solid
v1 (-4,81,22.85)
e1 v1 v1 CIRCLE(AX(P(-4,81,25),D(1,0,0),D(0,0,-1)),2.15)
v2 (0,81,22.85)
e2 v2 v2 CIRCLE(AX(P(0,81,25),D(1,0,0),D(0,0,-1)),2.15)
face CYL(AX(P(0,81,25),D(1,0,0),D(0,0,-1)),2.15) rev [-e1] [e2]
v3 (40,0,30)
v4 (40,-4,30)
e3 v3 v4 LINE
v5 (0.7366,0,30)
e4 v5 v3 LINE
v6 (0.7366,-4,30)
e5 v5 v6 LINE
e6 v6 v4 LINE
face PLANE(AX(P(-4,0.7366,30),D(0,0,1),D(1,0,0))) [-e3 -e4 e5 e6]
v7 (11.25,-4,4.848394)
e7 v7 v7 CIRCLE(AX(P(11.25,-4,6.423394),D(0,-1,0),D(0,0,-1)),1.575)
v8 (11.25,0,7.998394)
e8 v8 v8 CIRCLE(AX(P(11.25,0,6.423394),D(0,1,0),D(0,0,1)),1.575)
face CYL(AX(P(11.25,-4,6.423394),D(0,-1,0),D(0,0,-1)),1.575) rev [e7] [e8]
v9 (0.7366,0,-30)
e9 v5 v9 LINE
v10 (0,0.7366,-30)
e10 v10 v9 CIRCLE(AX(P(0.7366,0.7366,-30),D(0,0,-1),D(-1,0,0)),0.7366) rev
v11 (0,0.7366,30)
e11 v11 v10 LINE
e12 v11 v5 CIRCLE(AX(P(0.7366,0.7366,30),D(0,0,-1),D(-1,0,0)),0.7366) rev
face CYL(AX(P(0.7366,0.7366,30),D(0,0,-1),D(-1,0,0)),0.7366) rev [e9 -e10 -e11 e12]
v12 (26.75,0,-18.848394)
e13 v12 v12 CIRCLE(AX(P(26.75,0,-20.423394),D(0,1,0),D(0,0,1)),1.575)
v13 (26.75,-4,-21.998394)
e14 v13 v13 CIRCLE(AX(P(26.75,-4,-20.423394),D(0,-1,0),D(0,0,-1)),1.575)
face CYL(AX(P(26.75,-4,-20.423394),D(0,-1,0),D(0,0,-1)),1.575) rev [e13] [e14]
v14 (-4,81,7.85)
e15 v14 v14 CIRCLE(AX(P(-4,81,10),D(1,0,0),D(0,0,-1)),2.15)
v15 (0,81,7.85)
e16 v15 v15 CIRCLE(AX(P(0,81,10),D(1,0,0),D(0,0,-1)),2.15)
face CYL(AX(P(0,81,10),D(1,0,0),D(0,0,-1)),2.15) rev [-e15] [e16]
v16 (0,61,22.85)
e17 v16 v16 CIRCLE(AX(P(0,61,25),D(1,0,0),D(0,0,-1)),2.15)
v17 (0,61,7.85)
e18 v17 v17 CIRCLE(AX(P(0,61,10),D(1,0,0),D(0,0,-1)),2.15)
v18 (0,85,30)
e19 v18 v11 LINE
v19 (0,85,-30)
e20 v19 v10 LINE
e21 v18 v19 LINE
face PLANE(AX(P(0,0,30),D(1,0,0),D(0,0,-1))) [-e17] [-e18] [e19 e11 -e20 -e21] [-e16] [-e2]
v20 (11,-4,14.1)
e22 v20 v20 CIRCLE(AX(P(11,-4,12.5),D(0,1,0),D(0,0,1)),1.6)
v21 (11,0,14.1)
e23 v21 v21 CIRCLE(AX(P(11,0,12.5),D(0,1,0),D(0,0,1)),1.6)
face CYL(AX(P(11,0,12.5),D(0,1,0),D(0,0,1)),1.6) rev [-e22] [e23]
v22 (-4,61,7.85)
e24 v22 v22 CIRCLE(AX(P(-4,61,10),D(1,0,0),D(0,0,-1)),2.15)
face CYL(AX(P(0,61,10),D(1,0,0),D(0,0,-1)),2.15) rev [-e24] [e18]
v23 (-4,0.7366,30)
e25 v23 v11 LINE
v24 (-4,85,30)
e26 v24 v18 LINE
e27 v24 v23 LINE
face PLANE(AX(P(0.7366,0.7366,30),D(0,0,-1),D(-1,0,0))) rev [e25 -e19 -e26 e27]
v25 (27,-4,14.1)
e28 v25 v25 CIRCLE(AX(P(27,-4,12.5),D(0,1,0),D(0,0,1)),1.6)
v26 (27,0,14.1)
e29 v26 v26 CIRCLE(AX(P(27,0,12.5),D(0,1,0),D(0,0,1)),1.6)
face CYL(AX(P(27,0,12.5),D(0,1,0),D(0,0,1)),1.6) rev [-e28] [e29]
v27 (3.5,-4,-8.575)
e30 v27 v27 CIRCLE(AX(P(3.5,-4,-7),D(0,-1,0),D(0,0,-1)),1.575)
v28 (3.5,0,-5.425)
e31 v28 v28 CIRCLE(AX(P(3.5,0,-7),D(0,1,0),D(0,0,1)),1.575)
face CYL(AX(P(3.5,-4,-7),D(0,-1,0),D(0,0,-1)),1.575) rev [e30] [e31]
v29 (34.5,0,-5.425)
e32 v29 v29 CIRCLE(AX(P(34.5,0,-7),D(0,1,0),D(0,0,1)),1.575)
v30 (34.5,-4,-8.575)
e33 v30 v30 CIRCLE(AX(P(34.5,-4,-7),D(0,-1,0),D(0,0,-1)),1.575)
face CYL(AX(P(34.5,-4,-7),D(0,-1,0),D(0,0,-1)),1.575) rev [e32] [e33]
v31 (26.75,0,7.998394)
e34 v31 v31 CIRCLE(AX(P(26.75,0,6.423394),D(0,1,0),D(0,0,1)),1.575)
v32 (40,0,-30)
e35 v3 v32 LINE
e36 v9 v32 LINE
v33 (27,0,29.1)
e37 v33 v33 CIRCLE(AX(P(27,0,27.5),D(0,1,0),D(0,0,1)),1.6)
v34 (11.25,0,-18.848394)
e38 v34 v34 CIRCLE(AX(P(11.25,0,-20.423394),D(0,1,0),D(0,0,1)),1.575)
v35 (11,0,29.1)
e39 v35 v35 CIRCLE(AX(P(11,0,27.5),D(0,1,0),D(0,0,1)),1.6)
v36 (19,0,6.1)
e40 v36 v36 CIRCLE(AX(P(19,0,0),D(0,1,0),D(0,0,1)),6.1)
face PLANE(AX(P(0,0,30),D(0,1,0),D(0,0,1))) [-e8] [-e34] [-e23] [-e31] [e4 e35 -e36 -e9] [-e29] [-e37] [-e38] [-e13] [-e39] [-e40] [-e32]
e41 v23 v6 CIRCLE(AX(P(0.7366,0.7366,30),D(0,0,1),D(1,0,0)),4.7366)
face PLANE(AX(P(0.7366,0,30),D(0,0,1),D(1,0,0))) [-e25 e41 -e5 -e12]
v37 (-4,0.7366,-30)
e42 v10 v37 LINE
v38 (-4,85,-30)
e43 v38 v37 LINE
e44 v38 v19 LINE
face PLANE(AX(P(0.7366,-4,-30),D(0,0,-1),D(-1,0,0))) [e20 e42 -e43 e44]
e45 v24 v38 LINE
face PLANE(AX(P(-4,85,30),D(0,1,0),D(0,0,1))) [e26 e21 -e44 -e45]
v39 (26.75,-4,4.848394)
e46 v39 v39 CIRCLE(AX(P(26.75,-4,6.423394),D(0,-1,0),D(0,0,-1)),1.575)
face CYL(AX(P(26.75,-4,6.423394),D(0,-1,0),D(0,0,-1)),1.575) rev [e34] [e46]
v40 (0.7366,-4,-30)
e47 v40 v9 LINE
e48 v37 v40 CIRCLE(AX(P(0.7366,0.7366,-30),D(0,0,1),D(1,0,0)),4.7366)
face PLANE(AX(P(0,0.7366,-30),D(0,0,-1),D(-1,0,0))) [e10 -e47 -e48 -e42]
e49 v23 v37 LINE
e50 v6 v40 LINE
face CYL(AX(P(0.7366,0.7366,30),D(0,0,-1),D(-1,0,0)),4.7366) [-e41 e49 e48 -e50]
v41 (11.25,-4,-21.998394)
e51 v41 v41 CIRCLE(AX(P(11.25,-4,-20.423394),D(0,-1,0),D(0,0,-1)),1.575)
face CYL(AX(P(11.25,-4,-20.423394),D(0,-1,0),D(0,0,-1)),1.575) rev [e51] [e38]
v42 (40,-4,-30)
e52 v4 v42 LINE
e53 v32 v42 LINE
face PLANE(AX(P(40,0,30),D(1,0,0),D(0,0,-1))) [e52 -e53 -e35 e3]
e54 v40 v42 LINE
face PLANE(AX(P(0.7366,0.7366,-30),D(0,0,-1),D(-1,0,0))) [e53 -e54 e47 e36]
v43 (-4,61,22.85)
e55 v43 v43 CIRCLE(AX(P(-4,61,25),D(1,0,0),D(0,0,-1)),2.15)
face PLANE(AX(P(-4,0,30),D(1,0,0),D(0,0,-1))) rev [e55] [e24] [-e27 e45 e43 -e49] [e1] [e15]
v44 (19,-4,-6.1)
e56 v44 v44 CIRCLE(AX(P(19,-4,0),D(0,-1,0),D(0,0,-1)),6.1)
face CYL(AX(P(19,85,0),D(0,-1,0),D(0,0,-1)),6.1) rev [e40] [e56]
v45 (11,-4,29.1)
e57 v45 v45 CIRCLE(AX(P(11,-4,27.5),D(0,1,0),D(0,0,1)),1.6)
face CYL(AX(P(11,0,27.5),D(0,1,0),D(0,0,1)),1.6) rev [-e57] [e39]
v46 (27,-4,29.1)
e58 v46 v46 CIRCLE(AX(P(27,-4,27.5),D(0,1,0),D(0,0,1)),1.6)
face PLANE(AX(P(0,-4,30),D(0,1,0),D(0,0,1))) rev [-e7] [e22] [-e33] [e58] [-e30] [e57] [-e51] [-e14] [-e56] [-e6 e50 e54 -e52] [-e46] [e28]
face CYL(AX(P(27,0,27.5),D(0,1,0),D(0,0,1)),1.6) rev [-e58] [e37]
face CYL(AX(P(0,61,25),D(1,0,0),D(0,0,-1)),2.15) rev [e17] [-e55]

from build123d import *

# Parameters (mm, degrees)
SM_BASE_FLANGE_2_DEPTH = 30
HOLE_WIZARD_M3_1_D     = 3.2
SKETCH_24_R            = 6.1
CUT_EXTRUDE_2_DEPTH    = 103.08329932
HOLE_WIZARD_M4_1_D     = 4.3
HOLE_WIZARD_M2_1_D     = 2.2
HOLE_WIZARD_M3_1_2_D   = 3.15


# Sheet-metal steps are written as plain solids
with BuildPart() as part:
    # 草圖16 → 基材-凸緣2 (new, symmetric)
    with BuildSketch(Plane.XY):
        with BuildLine():
            Line((40, 0), (0.7366, 0))
            ThreePointArc((0.7366, 0), (0.215745145, 0.215745145), (0, 0.7366))
            Line((0, 0.7366), (0, 85))
            Line((0, 85), (-4, 85))
            Line((-4, 85), (-4, 0.7366))
            ThreePointArc((-4, 0.7366), (-2.61268198, -2.61268198), (0.7366, -4))
            Line((0.7366, -4), (40, -4))
            Line((40, -4), (40, 0))
        make_face()
    extrude(amount=SM_BASE_FLANGE_2_DEPTH, both=True)

    # Hole Wizard M3 _1 (through all)
    with Locations(Plane(origin=(0, 0, 0), x_dir=(-1, 0, 0), z_dir=(0, 1, 0))):
        with Locations((-27, 27.5), (-11, 12.5), (-11, 27.5), (-27, 12.5)):
            Hole(HOLE_WIZARD_M3_1_D / 2)

    # 草圖24 → 除料-伸長2 (cut, through all)
    with BuildSketch(Plane.XZ.offset(4)):
        with Locations(Location((19, 0, 0), (0, 0, 270))):
            Circle(SKETCH_24_R)
    extrude(amount=-CUT_EXTRUDE_2_DEPTH, mode=Mode.SUBTRACT)

    # M4 餘隙孔1 (through all)
    with Locations(Plane(origin=(0, 0, 0), x_dir=(0, 0, 1), z_dir=(1, 0, 0))):
        with Locations((10, -81), (25, -81), (25, -61), (10, -61)):
            Hole(HOLE_WIZARD_M4_1_D / 2)

    # M2 餘隙孔1 (through all)
    with Locations(Plane(origin=(0, -4, 0), x_dir=(-1, 0, 0), z_dir=(0, -1, 0))):
        with Locations((-14, 0), (-24, 0)):
            Hole(HOLE_WIZARD_M2_1_D / 2)

    # Hole Wizard M3 _1 2 (through all)
    with Locations(Plane(origin=(0, -4, 0), x_dir=(-1, 0, 0), z_dir=(0, -1, 0))):
        with Locations((-26.75, -6.423393759), (-34.5, 7), (-3.5, 7), (-11.25, -6.423393759), (-11.25, 20.423393759), (-26.75, 20.423393759)):
            Hole(HOLE_WIZARD_M3_1_2_D / 2)


solid = part.part
